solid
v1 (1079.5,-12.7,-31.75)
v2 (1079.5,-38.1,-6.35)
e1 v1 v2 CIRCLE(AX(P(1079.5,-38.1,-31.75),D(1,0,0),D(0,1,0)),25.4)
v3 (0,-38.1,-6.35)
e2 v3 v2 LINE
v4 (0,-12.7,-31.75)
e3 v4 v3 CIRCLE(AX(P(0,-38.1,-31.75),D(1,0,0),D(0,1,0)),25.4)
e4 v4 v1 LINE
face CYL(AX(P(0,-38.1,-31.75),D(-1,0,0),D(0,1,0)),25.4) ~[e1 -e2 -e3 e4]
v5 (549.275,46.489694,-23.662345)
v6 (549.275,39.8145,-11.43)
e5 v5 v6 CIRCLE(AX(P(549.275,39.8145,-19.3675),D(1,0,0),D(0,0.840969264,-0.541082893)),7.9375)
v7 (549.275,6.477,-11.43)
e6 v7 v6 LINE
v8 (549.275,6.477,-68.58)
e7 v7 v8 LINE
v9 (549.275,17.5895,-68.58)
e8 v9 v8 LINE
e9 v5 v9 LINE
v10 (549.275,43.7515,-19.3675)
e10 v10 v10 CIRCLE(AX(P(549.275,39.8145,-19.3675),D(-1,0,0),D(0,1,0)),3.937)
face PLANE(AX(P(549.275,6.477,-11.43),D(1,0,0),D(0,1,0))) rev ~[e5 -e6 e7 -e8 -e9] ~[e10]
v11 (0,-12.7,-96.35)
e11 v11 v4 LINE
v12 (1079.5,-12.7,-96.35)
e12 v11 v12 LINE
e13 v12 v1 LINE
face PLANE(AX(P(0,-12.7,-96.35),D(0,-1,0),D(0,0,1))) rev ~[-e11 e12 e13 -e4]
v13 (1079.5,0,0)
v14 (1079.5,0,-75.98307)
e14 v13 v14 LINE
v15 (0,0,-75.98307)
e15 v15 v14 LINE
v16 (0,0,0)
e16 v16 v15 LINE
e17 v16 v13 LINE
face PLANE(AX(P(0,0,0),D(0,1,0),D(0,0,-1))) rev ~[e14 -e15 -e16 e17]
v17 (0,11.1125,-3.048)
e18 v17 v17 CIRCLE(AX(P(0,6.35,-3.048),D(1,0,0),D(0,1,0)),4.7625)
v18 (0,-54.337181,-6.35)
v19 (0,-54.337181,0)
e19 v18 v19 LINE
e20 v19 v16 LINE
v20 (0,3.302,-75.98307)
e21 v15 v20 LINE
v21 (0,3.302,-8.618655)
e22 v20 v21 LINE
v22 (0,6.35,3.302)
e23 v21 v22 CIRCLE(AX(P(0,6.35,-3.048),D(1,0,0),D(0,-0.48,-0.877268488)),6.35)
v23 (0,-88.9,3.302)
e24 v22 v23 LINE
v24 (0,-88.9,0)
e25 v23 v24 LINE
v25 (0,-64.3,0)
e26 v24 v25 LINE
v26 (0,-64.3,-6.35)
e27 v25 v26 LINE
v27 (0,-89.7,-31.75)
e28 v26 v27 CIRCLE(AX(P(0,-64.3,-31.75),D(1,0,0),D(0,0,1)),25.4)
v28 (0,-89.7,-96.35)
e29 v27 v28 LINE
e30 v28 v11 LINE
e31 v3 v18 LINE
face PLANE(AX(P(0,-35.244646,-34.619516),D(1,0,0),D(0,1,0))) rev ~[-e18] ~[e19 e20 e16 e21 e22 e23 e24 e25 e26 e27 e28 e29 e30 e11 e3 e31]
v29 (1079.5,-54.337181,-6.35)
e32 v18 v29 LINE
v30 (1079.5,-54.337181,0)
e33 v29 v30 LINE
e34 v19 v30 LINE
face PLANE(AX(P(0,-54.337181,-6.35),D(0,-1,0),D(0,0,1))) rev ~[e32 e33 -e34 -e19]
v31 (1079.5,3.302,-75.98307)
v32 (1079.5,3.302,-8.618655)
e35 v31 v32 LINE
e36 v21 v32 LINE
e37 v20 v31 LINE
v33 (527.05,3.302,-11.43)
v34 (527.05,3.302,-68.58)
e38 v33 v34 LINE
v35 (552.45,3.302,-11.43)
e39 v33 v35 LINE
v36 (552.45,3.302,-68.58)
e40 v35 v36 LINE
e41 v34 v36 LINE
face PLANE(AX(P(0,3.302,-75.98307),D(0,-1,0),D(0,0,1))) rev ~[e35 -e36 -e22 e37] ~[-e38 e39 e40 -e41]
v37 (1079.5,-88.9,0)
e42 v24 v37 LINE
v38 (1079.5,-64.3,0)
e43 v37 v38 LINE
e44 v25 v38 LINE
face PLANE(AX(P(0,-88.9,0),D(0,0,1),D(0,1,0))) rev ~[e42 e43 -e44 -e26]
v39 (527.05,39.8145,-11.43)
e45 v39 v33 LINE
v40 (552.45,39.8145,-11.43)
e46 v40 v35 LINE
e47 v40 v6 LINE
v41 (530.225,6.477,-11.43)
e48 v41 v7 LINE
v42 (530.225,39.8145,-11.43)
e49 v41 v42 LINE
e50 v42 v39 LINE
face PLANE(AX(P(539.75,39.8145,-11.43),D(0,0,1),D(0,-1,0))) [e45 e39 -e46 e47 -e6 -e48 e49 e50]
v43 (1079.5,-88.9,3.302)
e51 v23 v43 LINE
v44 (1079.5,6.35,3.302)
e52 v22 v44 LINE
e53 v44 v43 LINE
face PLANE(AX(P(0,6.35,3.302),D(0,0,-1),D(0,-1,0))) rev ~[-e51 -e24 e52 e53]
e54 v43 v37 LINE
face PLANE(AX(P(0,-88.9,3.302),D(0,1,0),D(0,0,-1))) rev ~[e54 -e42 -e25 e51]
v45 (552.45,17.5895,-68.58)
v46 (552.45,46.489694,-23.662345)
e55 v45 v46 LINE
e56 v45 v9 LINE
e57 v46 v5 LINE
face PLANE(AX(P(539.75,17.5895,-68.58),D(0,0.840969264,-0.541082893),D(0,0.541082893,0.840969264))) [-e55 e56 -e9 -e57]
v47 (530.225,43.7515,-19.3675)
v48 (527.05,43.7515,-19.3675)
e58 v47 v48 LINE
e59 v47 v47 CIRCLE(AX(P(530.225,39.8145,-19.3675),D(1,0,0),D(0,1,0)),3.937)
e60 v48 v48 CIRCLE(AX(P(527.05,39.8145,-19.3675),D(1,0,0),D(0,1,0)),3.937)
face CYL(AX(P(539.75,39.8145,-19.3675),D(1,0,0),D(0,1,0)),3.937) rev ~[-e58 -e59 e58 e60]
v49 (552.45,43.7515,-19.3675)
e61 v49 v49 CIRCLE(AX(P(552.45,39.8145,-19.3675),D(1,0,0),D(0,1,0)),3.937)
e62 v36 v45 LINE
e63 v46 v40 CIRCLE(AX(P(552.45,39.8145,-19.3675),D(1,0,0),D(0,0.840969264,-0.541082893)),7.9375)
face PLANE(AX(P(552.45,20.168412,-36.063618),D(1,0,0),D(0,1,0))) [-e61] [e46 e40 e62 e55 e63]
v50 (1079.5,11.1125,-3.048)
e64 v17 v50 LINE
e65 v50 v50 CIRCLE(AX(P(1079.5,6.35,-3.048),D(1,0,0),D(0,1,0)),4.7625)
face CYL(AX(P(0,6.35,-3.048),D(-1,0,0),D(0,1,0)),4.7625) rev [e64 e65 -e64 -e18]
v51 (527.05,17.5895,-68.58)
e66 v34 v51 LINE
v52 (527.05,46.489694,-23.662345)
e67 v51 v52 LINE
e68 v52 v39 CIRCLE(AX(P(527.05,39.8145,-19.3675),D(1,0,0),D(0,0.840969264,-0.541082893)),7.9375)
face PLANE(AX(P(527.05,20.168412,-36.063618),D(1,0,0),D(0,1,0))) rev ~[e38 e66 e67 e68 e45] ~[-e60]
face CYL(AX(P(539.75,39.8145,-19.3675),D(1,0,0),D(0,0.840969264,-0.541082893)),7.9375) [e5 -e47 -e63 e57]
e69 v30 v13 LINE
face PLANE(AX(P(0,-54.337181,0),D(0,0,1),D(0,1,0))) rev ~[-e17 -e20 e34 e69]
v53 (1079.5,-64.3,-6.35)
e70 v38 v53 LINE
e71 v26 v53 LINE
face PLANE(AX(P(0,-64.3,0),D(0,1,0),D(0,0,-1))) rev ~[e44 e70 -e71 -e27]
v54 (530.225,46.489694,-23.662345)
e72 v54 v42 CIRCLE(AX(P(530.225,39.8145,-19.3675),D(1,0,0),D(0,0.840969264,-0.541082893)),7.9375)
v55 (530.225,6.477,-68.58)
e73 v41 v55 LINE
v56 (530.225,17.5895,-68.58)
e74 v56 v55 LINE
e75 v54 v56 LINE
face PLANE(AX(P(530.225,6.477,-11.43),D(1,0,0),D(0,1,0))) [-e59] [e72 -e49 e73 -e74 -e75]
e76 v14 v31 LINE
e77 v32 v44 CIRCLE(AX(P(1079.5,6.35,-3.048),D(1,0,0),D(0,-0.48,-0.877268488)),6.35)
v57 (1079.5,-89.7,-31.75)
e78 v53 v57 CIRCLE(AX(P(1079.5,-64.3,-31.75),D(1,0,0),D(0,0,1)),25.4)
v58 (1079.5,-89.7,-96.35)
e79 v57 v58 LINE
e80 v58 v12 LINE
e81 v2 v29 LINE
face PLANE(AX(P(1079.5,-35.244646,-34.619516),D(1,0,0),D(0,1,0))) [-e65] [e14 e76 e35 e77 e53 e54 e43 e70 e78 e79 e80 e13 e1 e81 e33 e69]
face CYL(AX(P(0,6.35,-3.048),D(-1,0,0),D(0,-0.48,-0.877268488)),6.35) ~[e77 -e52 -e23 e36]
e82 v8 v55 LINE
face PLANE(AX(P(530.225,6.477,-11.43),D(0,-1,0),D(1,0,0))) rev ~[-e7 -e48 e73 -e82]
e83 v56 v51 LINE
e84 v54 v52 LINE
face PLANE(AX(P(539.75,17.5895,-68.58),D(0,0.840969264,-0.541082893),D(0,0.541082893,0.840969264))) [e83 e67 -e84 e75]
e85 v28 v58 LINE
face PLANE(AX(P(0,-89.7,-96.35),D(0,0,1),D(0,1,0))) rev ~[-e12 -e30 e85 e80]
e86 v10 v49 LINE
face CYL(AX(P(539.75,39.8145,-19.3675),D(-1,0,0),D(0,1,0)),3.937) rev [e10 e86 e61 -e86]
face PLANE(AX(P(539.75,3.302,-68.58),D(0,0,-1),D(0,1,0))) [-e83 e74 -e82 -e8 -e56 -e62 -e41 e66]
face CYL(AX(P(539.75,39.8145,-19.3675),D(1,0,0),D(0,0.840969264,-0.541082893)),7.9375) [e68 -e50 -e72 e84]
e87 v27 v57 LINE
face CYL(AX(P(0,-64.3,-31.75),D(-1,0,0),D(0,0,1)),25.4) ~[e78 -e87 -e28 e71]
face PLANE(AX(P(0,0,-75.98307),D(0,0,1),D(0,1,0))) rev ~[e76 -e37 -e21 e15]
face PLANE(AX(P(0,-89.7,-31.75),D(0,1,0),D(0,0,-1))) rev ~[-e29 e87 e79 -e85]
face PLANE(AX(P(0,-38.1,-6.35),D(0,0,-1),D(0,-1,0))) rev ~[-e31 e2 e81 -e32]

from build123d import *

# Parameters (mm, degrees)
F0_R          = 4.7625
F1_DEPTH      = 1079.5
F3_R          = 3.937
F4_DEPTH      = 12.7
F4_DEPTH_BACK = 12.7
F5_W          = 19.05
F5_H          = 60.4399840052
F6_DEPTH      = 84.921


# Not quite as in the source:
# - a feature names something its author has since deleted; it is built from what else it names


with BuildPart() as f1:
    # F0 (on Right) → F1 (new body)
    with BuildSketch(Plane.YZ):
        with BuildLine():
            Line((-11.938, 0), (0, 0))
            Line((0, 0), (0, -3.048))
            Line((0, -3.048), (0, -8.6186548987))
            Line((0, -8.6186548987), (0, -75.9830698371))
            Line((0, -75.9830698371), (3.302, -75.9830698371))
            Line((3.302, -75.9830698371), (3.302, -8.6186548987))
            ThreePointArc((3.302, -8.6186548987), (12.5020792667, -4.6210291468), (6.35, 3.302))
            Line((6.35, 3.302), (-88.9, 3.302))
            Line((-88.9, 3.302), (-88.9, 0))
            Line((-88.9, 0), (-76.962, 0))
            Line((-76.962, 0), (-64.3, 0))
            Line((-64.3, 0), (-64.3, -6.35))
            ThreePointArc((-64.3, -6.35), (-82.2605122421, -13.7894877579), (-89.7, -31.75))
            Line((-89.7, -31.75), (-89.7, -96.35))
            Line((-89.7, -96.35), (-12.7, -96.35))
            Line((-12.7, -96.35), (-12.7, -31.75))
            ThreePointArc((-12.7, -31.75), (-20.1394877579, -13.7894877579), (-38.1, -6.35))
            Line((-38.1, -6.35), (-54.3371811509, -6.35))
            Line((-54.3371811509, -6.35), (-54.3371811509, 0))
            Line((-54.3371811509, 0), (-11.938, 0))
        make_face()
        with Locations((6.35, -3.048)):
            Circle(F0_R, mode=Mode.SUBTRACT)
    extrude(amount=F1_DEPTH)

    # F3 (on offset) → F4 (join, two sides)
    with BuildSketch(Plane.YZ.offset(539.75)) as f4_sk:
        with BuildLine():
            Line((3.302, -11.43), (3.302, -68.58))
            Line((3.302, -68.58), (17.5895, -68.58))
            Line((17.5895, -68.58), (46.489693531, -23.6623454656))
            ThreePointArc((46.489693531, -23.6623454656), (46.7820764127, -15.5652920647), (39.8145, -11.43))
            Line((39.8145, -11.43), (3.302, -11.43))
        make_face()
        with Locations((39.8145, -19.3675)):
            Circle(F3_R, mode=Mode.SUBTRACT)
    extrude(amount=F4_DEPTH)
    extrude(f4_sk.sketch, amount=-F4_DEPTH_BACK)

    # F5 (on face) → F6 (cut, through all)
    with BuildSketch(Plane.XY.offset(-11.43)):
        with Locations((539.75, 36.6969920026)):
            Rectangle(F5_W, F5_H)
    extrude(amount=-F6_DEPTH, mode=Mode.SUBTRACT)


solid = f1.part
